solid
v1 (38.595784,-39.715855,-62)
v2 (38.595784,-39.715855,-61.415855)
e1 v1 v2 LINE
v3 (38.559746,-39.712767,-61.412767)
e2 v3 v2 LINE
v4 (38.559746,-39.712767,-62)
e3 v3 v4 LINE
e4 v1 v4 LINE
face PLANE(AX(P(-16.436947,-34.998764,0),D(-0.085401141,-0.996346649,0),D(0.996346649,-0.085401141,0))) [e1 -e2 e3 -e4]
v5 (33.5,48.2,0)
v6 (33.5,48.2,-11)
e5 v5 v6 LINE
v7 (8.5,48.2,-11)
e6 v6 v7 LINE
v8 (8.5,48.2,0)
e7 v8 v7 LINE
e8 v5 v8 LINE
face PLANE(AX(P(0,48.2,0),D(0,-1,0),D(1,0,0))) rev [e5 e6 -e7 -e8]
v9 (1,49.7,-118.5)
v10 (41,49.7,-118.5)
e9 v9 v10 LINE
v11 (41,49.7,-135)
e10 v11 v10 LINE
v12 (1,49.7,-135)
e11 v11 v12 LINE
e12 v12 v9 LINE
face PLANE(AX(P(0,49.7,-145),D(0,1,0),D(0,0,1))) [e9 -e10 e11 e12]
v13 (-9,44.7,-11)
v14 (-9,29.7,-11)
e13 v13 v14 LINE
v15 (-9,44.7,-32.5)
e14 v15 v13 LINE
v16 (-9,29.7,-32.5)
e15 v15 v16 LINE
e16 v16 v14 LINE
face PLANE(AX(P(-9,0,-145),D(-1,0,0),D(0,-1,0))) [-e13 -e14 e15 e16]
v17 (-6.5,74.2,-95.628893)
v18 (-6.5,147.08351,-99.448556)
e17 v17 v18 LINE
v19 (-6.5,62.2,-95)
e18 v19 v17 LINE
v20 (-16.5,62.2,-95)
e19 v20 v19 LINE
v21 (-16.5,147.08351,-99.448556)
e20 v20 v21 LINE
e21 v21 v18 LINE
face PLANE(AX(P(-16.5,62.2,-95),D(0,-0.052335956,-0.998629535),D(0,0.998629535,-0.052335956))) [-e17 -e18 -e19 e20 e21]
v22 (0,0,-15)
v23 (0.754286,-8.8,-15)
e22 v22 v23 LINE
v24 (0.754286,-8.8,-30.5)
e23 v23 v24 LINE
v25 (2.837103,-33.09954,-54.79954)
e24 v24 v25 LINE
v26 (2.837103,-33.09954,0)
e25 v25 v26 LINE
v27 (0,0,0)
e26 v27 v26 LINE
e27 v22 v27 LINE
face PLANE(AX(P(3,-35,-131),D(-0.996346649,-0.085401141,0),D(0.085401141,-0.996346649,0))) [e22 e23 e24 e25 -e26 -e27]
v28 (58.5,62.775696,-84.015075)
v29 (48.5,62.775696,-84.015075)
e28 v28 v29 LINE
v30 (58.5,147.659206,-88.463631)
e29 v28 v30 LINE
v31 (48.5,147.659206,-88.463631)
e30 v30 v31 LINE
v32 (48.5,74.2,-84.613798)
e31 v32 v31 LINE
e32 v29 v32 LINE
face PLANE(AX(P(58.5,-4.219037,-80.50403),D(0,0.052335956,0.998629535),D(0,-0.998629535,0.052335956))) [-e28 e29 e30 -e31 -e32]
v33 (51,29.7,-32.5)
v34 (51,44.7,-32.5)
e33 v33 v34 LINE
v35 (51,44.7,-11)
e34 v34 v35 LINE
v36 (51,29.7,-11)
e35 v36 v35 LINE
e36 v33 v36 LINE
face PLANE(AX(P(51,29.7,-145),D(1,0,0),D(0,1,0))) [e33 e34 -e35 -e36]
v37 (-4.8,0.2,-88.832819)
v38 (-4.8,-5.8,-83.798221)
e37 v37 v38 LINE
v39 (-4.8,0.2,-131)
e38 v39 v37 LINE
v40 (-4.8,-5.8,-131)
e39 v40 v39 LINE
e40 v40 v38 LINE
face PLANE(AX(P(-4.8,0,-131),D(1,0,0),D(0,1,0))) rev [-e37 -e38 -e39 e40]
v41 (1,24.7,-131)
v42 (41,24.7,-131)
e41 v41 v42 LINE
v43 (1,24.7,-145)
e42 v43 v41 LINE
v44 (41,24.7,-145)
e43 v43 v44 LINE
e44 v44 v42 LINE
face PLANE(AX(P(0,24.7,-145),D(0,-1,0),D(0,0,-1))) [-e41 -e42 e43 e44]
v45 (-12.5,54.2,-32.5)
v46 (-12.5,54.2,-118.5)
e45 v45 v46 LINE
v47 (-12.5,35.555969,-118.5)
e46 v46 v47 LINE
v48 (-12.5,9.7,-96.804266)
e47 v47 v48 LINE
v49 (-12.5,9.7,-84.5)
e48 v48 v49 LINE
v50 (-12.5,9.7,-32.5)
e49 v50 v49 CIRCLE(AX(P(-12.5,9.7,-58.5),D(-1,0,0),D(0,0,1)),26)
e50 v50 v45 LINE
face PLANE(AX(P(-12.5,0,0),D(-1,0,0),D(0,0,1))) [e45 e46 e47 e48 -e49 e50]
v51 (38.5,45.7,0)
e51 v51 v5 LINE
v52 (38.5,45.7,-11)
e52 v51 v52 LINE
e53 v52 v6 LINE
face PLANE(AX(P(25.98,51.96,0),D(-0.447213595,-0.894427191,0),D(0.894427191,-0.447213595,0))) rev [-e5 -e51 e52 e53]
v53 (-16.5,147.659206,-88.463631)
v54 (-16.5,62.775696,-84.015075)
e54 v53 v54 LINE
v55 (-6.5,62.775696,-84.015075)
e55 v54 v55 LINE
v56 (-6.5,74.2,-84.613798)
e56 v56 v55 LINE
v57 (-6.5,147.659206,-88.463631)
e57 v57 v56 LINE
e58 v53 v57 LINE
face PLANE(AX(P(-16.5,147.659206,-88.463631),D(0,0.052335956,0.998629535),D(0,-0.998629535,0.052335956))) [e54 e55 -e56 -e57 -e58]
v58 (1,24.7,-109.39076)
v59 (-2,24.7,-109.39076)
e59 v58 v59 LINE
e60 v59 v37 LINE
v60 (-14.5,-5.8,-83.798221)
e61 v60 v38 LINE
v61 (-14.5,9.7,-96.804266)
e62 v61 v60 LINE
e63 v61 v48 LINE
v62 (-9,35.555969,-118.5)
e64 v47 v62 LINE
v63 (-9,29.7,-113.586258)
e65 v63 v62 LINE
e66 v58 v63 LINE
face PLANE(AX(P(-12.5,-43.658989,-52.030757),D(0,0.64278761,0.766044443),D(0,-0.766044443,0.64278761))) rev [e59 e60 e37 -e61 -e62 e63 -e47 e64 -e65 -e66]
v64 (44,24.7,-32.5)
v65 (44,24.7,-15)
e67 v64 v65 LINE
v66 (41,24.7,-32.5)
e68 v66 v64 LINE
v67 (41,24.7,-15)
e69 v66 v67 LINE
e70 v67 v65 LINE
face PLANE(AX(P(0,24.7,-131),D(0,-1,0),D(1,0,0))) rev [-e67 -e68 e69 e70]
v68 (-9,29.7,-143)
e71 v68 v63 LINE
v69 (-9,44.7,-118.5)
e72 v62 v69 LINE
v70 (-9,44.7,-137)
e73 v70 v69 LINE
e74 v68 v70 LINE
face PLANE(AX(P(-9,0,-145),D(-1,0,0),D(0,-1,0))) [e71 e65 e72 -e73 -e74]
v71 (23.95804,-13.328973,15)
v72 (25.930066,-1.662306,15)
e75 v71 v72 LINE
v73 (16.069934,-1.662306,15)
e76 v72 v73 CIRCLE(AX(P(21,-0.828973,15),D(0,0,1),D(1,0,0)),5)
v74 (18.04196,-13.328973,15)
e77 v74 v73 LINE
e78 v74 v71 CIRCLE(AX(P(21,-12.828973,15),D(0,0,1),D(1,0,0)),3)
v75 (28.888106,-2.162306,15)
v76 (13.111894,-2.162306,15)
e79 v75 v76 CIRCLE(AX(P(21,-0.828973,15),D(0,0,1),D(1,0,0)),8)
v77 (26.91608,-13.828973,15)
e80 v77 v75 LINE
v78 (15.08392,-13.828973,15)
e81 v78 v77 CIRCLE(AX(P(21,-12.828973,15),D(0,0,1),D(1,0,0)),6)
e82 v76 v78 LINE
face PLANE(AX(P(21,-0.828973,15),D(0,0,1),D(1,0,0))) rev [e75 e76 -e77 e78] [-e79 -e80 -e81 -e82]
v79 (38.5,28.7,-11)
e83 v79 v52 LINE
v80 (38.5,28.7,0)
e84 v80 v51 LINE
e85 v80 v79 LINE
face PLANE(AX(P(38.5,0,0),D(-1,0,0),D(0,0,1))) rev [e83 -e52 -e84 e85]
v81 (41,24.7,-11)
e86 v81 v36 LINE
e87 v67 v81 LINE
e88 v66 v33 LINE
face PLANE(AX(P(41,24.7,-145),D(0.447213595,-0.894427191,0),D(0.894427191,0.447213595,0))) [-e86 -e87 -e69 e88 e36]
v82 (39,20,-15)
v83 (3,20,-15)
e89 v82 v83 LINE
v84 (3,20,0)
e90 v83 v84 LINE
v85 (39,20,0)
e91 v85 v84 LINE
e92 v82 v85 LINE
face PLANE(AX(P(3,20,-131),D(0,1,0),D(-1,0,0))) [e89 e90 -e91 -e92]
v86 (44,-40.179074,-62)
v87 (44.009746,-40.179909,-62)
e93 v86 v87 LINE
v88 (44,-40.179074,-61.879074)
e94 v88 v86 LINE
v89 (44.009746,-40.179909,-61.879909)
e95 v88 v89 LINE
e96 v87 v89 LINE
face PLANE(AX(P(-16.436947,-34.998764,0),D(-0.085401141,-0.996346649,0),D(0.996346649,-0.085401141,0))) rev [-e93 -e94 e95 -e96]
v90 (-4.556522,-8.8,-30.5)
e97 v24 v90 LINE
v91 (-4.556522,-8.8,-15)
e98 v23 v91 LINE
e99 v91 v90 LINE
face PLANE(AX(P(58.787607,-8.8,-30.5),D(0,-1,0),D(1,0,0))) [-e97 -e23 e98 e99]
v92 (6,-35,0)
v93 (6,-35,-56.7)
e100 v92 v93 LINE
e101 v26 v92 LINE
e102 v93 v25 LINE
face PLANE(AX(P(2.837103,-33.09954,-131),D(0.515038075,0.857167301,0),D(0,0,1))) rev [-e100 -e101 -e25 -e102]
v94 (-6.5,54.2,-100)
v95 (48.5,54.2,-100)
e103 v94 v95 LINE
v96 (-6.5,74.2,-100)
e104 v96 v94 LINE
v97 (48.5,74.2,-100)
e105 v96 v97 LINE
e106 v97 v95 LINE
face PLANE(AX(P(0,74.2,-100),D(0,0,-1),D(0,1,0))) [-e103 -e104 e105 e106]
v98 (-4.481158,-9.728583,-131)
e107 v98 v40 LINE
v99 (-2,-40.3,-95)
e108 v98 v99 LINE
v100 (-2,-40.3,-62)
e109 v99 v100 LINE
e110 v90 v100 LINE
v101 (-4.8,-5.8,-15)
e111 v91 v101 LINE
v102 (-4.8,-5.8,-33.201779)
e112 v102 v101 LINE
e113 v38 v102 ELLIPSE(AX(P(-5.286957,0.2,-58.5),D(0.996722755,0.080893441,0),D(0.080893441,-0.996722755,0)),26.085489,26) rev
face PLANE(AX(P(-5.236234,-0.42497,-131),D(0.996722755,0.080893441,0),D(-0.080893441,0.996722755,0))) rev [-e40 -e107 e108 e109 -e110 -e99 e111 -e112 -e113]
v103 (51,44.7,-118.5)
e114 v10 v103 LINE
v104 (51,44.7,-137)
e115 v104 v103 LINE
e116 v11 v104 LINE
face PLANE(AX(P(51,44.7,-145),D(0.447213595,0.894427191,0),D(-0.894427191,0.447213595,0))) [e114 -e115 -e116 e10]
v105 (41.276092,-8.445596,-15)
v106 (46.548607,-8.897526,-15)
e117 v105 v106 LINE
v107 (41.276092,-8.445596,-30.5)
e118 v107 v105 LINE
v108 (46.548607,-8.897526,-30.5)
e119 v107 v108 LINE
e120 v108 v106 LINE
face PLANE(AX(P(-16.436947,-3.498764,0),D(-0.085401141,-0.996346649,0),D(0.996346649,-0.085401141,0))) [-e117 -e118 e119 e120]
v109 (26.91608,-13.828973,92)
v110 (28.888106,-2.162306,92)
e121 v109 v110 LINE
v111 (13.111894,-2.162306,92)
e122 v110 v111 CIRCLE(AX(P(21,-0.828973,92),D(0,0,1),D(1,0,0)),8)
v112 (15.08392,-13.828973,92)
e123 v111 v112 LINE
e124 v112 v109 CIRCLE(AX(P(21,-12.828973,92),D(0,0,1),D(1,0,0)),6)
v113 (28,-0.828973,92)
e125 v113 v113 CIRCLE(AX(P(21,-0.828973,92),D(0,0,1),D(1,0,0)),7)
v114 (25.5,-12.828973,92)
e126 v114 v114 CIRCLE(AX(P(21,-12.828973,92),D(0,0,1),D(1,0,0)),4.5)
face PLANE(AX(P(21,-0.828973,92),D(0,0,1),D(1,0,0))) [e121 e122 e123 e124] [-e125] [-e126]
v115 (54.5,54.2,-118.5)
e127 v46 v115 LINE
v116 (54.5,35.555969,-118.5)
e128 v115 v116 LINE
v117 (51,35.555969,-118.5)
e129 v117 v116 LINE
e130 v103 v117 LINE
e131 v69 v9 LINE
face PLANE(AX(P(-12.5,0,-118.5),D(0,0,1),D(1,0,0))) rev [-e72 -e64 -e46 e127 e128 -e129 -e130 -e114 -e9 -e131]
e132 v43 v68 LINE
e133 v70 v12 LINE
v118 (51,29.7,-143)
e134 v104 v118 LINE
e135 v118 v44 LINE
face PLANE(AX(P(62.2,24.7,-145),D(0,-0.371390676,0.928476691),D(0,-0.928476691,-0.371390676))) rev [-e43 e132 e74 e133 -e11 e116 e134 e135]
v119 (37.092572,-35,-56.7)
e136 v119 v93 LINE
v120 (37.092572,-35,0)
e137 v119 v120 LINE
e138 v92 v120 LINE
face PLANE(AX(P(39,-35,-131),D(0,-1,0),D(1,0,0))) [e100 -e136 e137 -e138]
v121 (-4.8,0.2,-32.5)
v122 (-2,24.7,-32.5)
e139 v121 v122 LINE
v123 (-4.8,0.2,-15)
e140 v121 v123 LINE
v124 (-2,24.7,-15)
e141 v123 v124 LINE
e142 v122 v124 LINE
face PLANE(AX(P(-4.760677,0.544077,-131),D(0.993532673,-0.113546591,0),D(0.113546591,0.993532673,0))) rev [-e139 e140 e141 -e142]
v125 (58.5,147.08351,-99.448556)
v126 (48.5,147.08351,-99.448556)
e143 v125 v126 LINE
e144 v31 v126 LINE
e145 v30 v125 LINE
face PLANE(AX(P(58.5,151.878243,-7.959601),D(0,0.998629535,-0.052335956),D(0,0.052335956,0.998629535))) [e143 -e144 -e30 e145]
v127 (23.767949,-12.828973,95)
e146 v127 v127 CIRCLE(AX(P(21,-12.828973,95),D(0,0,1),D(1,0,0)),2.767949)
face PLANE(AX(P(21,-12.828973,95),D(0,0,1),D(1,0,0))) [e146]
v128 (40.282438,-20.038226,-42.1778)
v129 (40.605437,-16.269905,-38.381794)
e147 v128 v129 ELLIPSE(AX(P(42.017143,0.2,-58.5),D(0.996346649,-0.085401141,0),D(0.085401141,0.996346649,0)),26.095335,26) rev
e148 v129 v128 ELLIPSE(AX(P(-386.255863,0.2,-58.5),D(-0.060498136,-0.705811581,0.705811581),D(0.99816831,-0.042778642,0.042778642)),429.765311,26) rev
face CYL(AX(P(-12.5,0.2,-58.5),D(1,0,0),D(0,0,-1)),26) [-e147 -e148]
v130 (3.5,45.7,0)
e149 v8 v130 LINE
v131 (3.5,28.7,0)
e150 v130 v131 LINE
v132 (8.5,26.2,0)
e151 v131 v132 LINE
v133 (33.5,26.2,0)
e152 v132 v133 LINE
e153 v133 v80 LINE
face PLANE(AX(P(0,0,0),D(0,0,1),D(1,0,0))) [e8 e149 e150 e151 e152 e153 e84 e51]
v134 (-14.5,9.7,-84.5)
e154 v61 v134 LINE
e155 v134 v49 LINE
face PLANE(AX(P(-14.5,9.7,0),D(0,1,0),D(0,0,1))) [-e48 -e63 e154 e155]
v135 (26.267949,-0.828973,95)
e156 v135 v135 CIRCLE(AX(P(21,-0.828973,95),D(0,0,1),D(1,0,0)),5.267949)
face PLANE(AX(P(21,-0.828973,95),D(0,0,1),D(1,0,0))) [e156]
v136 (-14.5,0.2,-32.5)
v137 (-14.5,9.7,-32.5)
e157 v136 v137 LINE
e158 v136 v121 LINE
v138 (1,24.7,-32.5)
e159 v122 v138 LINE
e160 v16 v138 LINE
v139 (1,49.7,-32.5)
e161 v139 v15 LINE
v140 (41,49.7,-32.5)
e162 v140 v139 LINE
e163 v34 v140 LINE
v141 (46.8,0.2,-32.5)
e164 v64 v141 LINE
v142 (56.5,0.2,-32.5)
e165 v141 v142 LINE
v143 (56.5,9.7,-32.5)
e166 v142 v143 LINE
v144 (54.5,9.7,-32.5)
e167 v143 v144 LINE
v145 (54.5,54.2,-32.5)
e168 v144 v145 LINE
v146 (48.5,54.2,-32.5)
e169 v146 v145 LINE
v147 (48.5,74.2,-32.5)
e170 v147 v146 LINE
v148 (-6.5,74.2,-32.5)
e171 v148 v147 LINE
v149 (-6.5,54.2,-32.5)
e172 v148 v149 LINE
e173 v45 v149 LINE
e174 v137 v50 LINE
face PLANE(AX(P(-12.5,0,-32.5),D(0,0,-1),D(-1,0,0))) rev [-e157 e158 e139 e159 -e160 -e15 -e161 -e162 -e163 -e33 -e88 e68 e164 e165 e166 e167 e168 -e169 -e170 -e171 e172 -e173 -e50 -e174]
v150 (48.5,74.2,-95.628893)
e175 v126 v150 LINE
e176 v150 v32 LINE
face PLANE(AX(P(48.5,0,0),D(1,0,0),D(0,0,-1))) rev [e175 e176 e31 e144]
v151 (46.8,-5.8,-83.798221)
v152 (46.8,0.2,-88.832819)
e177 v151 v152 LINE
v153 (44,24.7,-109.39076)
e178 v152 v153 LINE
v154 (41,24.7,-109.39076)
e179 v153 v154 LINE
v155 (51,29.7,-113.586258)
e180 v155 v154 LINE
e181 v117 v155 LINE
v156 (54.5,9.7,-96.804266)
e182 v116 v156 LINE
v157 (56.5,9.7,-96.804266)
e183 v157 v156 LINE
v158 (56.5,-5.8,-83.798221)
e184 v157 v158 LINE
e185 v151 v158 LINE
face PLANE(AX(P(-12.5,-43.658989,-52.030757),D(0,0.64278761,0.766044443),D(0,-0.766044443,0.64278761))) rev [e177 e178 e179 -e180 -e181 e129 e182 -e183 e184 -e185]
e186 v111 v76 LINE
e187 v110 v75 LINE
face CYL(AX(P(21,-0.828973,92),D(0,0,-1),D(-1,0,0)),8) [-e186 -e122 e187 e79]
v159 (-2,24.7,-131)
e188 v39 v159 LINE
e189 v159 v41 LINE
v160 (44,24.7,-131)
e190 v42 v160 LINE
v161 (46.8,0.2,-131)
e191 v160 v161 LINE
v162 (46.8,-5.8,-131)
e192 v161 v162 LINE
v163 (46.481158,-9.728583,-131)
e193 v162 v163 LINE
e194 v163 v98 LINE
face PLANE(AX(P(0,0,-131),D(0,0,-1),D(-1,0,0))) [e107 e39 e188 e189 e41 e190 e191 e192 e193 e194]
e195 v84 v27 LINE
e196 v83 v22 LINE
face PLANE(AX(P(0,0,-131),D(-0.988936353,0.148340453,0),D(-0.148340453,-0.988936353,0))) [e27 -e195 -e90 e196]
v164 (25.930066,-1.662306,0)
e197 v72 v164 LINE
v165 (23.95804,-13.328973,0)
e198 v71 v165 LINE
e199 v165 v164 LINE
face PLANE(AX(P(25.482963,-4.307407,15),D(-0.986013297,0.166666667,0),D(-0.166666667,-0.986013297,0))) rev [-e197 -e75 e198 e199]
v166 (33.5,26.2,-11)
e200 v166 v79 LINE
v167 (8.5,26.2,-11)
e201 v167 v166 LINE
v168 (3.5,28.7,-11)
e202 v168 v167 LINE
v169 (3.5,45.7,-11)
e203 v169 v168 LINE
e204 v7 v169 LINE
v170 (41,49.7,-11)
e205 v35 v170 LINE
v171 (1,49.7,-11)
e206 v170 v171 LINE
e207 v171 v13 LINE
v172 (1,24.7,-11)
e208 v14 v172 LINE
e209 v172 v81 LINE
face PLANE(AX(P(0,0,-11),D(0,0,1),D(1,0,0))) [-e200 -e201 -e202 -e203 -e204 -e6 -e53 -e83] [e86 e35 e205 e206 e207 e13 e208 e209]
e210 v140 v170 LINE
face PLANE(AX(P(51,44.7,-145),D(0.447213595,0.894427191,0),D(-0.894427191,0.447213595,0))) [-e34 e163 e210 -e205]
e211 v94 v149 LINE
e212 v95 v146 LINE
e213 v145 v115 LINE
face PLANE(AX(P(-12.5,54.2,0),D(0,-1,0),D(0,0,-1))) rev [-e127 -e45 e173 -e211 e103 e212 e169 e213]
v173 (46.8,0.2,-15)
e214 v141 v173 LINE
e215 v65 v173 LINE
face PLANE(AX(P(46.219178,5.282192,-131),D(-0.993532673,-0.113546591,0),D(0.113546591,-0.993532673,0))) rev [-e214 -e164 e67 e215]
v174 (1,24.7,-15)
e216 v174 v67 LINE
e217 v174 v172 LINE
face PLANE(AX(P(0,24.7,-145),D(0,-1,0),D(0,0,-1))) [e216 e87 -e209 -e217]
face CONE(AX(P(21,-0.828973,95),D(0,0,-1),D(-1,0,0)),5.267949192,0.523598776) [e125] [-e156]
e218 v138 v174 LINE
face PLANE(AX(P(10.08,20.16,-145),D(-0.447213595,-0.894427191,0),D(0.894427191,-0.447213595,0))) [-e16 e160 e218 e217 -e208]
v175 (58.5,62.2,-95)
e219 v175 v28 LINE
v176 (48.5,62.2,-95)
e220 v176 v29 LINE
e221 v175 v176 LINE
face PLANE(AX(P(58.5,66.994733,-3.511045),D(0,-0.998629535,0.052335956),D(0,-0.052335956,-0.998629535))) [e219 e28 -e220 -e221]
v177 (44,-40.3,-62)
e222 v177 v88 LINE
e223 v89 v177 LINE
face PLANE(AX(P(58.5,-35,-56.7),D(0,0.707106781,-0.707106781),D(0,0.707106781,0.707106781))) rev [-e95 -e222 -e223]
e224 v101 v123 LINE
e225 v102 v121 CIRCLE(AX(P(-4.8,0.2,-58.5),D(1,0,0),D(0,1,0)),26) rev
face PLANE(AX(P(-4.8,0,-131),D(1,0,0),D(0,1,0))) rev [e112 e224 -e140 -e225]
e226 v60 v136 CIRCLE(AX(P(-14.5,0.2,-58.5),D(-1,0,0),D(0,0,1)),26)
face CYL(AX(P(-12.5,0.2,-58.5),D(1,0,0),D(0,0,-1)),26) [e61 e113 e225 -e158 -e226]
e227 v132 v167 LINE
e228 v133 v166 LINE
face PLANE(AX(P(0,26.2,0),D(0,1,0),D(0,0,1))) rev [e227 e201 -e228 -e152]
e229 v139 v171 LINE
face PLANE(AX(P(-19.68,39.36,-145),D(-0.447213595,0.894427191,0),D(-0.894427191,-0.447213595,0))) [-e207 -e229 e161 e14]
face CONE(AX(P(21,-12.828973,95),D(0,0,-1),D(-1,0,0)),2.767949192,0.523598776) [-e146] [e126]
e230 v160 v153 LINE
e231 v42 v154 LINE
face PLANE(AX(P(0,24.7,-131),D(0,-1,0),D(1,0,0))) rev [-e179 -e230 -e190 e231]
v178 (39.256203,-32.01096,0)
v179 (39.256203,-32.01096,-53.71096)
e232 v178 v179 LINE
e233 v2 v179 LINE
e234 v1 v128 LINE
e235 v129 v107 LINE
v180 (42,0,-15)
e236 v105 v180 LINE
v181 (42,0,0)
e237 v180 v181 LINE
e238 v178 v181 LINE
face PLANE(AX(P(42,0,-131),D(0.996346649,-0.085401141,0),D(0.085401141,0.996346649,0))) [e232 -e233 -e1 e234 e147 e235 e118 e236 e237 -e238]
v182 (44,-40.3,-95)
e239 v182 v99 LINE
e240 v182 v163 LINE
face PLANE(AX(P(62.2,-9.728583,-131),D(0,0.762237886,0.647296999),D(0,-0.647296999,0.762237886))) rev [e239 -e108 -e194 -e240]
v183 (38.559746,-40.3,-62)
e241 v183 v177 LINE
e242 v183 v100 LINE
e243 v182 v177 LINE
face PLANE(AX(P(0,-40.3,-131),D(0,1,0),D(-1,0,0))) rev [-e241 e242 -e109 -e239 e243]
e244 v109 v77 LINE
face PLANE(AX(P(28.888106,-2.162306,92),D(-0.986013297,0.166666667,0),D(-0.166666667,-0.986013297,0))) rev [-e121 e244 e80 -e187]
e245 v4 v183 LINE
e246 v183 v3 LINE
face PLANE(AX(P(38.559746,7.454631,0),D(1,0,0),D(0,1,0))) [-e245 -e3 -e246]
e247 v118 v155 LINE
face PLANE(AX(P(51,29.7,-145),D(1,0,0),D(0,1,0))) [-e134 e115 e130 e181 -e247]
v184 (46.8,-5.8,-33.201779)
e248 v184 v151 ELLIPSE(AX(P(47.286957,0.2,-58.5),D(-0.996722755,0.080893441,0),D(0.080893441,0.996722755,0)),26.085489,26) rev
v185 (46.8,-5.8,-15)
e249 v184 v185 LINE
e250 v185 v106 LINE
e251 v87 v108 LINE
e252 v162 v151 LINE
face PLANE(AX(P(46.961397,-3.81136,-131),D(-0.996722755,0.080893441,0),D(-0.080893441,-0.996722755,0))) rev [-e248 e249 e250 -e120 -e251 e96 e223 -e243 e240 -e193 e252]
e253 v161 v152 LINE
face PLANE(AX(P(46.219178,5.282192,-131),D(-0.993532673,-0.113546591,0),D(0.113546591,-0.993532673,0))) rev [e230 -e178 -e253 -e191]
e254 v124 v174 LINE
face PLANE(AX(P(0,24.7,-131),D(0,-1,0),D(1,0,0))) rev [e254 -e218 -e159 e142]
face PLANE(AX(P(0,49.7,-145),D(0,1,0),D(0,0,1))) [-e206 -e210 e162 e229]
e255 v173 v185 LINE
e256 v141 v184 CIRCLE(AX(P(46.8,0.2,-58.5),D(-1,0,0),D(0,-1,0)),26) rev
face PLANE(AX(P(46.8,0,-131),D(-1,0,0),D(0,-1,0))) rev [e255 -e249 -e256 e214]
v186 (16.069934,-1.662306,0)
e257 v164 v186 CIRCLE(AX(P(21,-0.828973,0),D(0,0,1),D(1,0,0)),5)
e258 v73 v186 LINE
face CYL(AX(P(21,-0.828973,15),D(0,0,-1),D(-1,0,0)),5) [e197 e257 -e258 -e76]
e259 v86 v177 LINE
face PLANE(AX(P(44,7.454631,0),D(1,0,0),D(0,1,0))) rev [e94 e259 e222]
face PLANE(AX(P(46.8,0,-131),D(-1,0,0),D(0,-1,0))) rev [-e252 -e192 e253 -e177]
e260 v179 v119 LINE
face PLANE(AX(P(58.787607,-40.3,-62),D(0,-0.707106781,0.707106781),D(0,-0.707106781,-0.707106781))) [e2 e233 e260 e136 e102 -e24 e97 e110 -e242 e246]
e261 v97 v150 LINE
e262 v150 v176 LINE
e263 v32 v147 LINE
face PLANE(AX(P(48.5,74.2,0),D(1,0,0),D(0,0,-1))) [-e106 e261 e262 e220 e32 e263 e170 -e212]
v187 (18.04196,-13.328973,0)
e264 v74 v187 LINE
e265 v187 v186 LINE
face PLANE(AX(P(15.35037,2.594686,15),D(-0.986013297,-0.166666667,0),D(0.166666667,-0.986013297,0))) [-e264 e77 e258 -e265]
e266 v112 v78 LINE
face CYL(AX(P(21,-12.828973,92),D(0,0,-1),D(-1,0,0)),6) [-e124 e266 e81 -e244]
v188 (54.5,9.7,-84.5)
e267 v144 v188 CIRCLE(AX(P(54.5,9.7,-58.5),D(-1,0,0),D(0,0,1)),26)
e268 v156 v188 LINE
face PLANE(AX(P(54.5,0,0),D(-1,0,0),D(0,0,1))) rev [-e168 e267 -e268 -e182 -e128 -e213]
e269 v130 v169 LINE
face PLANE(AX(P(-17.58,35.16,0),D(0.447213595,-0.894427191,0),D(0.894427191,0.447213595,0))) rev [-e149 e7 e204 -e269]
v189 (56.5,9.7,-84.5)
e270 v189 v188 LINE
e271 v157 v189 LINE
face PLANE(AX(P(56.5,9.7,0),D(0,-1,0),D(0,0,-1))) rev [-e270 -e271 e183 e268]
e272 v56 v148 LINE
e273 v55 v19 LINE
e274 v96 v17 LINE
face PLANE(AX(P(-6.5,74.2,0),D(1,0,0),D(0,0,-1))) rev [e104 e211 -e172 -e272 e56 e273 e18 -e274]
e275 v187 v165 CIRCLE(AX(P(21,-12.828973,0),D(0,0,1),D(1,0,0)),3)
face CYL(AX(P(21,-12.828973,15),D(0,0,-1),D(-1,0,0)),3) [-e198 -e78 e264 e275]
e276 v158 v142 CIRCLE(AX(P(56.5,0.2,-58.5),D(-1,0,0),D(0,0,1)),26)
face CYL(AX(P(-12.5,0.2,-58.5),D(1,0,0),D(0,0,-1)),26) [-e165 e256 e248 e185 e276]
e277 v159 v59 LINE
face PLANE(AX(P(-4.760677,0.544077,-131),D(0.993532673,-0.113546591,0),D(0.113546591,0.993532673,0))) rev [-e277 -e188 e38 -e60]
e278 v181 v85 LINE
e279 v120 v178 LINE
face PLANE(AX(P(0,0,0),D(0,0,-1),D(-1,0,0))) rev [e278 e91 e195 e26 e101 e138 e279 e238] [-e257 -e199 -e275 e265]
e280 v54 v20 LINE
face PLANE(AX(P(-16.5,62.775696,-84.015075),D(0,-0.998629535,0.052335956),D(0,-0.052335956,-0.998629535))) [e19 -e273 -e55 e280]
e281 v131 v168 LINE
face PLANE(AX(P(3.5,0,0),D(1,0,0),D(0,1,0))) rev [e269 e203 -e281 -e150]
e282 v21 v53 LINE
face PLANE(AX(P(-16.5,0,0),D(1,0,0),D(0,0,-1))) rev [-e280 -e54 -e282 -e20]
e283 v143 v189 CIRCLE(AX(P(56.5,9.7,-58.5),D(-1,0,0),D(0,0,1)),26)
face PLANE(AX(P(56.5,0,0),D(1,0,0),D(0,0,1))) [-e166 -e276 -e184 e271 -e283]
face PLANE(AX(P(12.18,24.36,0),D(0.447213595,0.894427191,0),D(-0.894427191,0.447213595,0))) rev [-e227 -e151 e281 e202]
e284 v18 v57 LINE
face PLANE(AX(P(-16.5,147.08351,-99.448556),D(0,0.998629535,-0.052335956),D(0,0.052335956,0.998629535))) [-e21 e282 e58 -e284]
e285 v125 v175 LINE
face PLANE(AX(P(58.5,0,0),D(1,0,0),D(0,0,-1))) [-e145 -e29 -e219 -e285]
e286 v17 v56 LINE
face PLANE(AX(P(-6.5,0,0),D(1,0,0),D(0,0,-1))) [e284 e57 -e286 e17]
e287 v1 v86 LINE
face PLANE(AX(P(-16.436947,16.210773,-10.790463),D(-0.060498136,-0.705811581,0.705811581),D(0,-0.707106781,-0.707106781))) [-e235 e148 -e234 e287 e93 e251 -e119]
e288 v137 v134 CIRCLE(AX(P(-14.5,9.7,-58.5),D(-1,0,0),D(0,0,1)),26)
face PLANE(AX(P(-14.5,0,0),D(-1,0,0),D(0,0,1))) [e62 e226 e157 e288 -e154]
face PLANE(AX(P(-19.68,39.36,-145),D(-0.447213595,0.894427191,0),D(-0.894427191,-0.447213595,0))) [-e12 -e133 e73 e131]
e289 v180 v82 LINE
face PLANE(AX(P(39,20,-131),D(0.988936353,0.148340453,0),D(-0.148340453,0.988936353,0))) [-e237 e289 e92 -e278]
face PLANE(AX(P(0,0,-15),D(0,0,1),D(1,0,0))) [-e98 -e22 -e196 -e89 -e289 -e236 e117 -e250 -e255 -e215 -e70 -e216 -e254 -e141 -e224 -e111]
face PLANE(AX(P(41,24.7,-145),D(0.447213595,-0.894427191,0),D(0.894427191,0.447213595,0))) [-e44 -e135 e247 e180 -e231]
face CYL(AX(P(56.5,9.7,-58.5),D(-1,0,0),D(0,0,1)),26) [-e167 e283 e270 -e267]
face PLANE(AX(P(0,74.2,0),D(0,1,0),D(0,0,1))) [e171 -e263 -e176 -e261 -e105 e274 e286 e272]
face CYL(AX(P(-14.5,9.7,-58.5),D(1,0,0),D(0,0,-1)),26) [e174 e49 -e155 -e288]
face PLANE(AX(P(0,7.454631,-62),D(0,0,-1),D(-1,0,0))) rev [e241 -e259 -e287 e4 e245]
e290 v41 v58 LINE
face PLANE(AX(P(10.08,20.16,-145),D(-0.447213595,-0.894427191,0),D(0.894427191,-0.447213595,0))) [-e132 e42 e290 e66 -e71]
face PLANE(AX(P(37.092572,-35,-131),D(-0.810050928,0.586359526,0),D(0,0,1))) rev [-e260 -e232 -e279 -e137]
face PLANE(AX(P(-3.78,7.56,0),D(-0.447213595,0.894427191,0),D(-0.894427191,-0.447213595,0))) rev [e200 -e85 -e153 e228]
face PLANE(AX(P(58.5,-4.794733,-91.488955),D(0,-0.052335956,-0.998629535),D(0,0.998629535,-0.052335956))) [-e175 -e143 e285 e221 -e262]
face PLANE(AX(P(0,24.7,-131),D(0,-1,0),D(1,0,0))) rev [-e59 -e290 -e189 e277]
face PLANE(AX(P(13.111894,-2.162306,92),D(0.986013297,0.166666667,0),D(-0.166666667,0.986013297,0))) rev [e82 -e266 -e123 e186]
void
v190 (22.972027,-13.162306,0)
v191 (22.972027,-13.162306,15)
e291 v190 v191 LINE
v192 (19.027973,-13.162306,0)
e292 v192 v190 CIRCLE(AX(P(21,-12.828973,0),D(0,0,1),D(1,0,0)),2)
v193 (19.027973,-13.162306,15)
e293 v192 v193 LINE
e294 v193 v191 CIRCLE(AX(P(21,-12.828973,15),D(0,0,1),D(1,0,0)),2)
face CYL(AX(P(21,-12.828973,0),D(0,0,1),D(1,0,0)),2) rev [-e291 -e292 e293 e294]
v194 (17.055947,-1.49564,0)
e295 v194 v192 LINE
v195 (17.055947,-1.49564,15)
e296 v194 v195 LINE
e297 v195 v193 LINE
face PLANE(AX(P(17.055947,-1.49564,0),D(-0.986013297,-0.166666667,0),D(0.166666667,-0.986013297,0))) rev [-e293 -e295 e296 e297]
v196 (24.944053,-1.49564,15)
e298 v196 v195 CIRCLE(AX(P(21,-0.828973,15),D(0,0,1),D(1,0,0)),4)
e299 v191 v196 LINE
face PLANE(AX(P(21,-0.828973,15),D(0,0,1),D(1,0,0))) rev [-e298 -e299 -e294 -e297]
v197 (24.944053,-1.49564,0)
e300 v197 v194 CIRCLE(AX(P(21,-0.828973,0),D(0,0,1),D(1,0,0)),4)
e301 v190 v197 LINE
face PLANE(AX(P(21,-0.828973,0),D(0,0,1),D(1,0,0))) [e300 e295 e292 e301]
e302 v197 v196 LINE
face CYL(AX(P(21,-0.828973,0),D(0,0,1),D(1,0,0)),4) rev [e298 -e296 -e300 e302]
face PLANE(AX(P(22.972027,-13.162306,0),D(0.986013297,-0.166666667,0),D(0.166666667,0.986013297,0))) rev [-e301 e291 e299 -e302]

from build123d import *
from OCP.BRepFilletAPI import BRepFilletAPI_MakeChamfer

# Parameters (mm, degrees)
EXTRUDE_1_DEPTH     = 131
EXTRUDE_2_DEPTH     = 116
CUT_EXTRUDE_1_REACH = 148.45
CUT_EXTRUDE_2_REACH = 148.994
EXTRUDE_3_DEPTH     = 134
CUT_EXTRUDE_3_DEPTH = 67
EXTRUDE_4_DEPTH     = 11
EXTRUDE_START       = -33.5
EXTRUDE_5_DEPTH     = 67
EXTRUDE_6_DEPTH     = 2
EXTRUDE_7_DEPTH     = 20
EXTRUDE_8_DEPTH     = 10
EXTRUDE_9_DEPTH     = 10
CUT_EXTRUDE_4_REACH = 246.491
SKETCH_16_W         = 5.440253517
SKETCH_16_H         = 47
CUT_EXTRUDE_5_DEPTH = 219.790404517
EXTRUDE_10_DEPTH    = 15
CUT_EXTRUDE_6_DEPTH = 15
EXTRUDE_15_DEPTH    = 77
SKETCH_23_R         = 7
SKETCH_23_R_2       = 4.5
EXTRUDE_16_DEPTH    = 3
CHAMFER_1_SIZE      = 3
CHAMFER_1_SIZE_2    = 1.732050808
CHAMFER_2_SIZE      = 3
CHAMFER_2_SIZE2     = 1.907428497


# Read off the part's stored shape, not the designer's step: 凸台-拉伸5
with BuildPart() as part:
    # 草图1 → 凸台-拉伸1 (new body)
    with BuildSketch(Plane.XY):
        Polygon((0, 0), (3, 20), (39, 20), (42, 0), (39, -35), (3, -35), align=None)
    extrude(amount=-EXTRUDE_1_DEPTH)

    # 草图2 → 凸台-拉伸2 (add)
    with BuildSketch(Plane.XY.offset(-15)):
        Polygon((-2, 24.7), (-4.8, 0.2), (-4.8, -5.8), (-2, -40.3), (21, -40.3), (21, -35), (3, -35), (0, 0), (3, 20), (21, 20), (21, 24.7), align=None)
        Polygon((44, 24.7), (21, 24.7), (21, 20), (39, 20), (42, 0), (39, -35), (21, -35), (21, -40.3), (44, -40.3), (46.8, -5.8), (46.8, 0.2), align=None)
    extrude(amount=-EXTRUDE_2_DEPTH)

    # 切除-拉伸1: up to this plane
    cut_extrude_1_end = Plane(origin=(3, -35, -131), z_dir=(-0.996346649041751, -0.08540114134643588, 0))
    # 草图3 → 切除-拉伸1 (cut, up to the surface)
    with BuildSketch(Plane.ZY.offset(4.8), mode=Mode.PRIVATE) as cut_extrude_1_sk1:
        Polygon((-131, -40.3), (-131, -10.092413278), (-95, -40.3), align=None)
    cut_extrude_1_tool1 = split(extrude(cut_extrude_1_sk1.sketch, amount=-CUT_EXTRUDE_1_REACH, mode=Mode.PRIVATE), bisect_by=cut_extrude_1_end, keep=Keep.BOTH, mode=Mode.PRIVATE)
    add(cut_extrude_1_tool1.solids().sort_by_distance((-4.8, -30.230804, -119))[0], mode=Mode.SUBTRACT)
    # 草图3 → 切除-拉伸1 (cut, up to the surface)
    with BuildSketch(Plane.ZY.offset(4.8), mode=Mode.PRIVATE) as cut_extrude_1_sk2:
        Polygon((-62, -40.3), (-30.5, -8.8), (-15, -8.8), (-15, -40.3), align=None)
    cut_extrude_1_tool2 = split(extrude(cut_extrude_1_sk2.sketch, amount=-CUT_EXTRUDE_1_REACH, mode=Mode.PRIVATE), bisect_by=cut_extrude_1_end, keep=Keep.BOTH, mode=Mode.PRIVATE)
    add(cut_extrude_1_tool2.solids().sort_by_distance((-4.8, -27.196, -31.948))[0], mode=Mode.SUBTRACT)

    # 切除-拉伸2: up to this plane
    cut_extrude_2_end = Plane(origin=(42, 0, -131), z_dir=(0.996346649041751, -0.08540114134643569, 0))
    # 草图4 → 切除-拉伸2 (cut, up to the surface)
    with BuildSketch(Plane(origin=(46.8, 0, 0), x_dir=(0, 0, -1), z_dir=(1, 0, 0)), mode=Mode.PRIVATE) as cut_extrude_2_sk1:
        Polygon((15, -8.919073988), (15, -40.419073988), (62, -40.419073988), (30.5, -8.919073988), align=None)
    cut_extrude_2_tool1 = split(extrude(cut_extrude_2_sk1.sketch, amount=CUT_EXTRUDE_2_REACH, dir=(-0.996346649042, 0.085401141346, 0), mode=Mode.PRIVATE), bisect_by=cut_extrude_2_end, keep=Keep.BOTH, mode=Mode.PRIVATE)
    add(cut_extrude_2_tool1.solids().sort_by_distance((46.8, -27.315074, -31.948))[0], mode=Mode.SUBTRACT)

    # 草图6 → 凸台-拉伸3 (add)
    with BuildSketch(Plane.XY.offset(-11)):
        Polygon((-9, 29.7), (1, 24.7), (41, 24.7), (51, 29.7), (51, 44.7), (41, 49.7), (1, 49.7), (-9, 44.7), align=None)
    extrude(amount=-EXTRUDE_3_DEPTH)

    # 草图7 → 切除-拉伸3 (cut, symmetric)
    with BuildSketch(Plane.ZY.offset(4.8)):
        Polygon((-95, -40.3), (-131, -40.3), (-131, -9.728583388), align=None)
        Polygon((-145, 24.7), (-135, 49.7), (-145, 49.7), align=None)
    extrude(amount=CUT_EXTRUDE_3_DEPTH, both=True, mode=Mode.SUBTRACT)

    # 草图9 → 凸台-拉伸4 (add)
    with BuildSketch(Plane.XY.offset(-11)):
        Polygon((3.5, 45.7), (3.5, 28.7), (8.5, 26.2), (33.5, 26.2), (38.5, 28.7), (38.5, 45.7), (33.5, 48.2), (8.5, 48.2), align=None)
    extrude(amount=EXTRUDE_4_DEPTH)

    # 凸台-拉伸5 outline → 凸台-拉伸5 (add)
    with BuildSketch(Plane.ZY.offset(-21).offset(EXTRUDE_START)):
        with BuildLine():
            Line((-118.5, 35.555969457), (-83.798221281, -5.8))
            ThreePointArc((-83.798221281, -5.8), (-66.915700425, -24.400324924), (-42.17780049, -20.038226285))
            ThreePointArc((-42.17780049, -20.038226285), (-40.182635106, -18.251941452), (-38.381793618, -16.269905038))
            ThreePointArc((-38.381793618, -16.269905038), (-34.014561818, -8.544330565), (-32.5, 0.2))
            Line((-32.5, 0.2), (-32.5, 54.2))
            Line((-32.5, 54.2), (-118.5, 54.2))
            Line((-118.5, 54.2), (-118.5, 35.555969457))
        make_face()
    extrude(amount=EXTRUDE_5_DEPTH)

    # 草图11 → 凸台-拉伸6 (add)
    with BuildSketch(Plane.ZY.offset(12.5)):
        with BuildLine():
            Line((-84.5, 9.7), (-96.804265564, 9.7))
            Line((-96.804265564, 9.7), (-83.798221281, -5.8))
            ThreePointArc((-83.798221281, -5.8), (-66.915700425, -24.400324924), (-42.17780049, -20.038226285))
            ThreePointArc((-42.17780049, -20.038226285), (-40.182635106, -18.251941452), (-38.381793618, -16.269905038))
            ThreePointArc((-38.381793618, -16.269905038), (-34.014561818, -8.544330565), (-32.5, 0.2))
            Line((-32.5, 0.2), (-32.5, 9.7))
            ThreePointArc((-32.5, 9.7), (-58.5, 35.7), (-84.5, 9.7))
        make_face()
    extrude_6 = extrude(amount=EXTRUDE_6_DEPTH)

    # 镜向1: 凸台-拉伸6 across plane
    add(extrude_6.mirror(Plane.ZY.offset(-21)))

    # 草图12 → 凸台-拉伸7 (add)
    with BuildSketch(Plane(origin=(0, 54.2, 0), x_dir=(1, 0, 0), z_dir=(0, 1, 0))):
        Polygon((21, 100), (-6.5, 100), (-6.5, 32.5), (48.5, 32.5), (48.5, 100), align=None)
    extrude(amount=EXTRUDE_7_DEPTH)

    # 草图13 → 凸台-拉伸8 (add)
    with BuildSketch(Plane.ZY.offset(6.5)):
        Polygon((-95, 62.2), (-99.448556281, 147.083510454), (-88.463631398, 147.659205973), (-84.015075118, 62.775695519), align=None)
    extrude(amount=EXTRUDE_8_DEPTH)

    # 草图14 → 凸台-拉伸9 (add)
    with BuildSketch(Plane(origin=(48.5, 0, 0), x_dir=(0, 0, -1), z_dir=(1, 0, 0))):
        Polygon((84.613797545, 74.2), (95.628893351, 74.2), (99.448556281, 147.083510454), (88.463631398, 147.659205973), align=None)
        Polygon((84.015075118, 62.775695519), (95, 62.2), (95.628893351, 74.2), (84.613797545, 74.2), align=None)
    extrude(amount=EXTRUDE_9_DEPTH)

    # 切除-拉伸4: up to this plane
    cut_extrude_4_end = Plane(origin=(-16.436947072, -34.998764239, 0), z_dir=(-0.08540114134643567, -0.996346649041751, 0))
    # 草图16 → 切除-拉伸4 (cut, up to the surface)
    with BuildSketch(Plane.XZ.offset(40.3), mode=Mode.PRIVATE) as cut_extrude_4_sk1:
        with Locations((41.279873241, -38.5)):
            Rectangle(SKETCH_16_W, SKETCH_16_H)
    cut_extrude_4_tool1 = split(extrude(cut_extrude_4_sk1.sketch, amount=-CUT_EXTRUDE_4_REACH, mode=Mode.PRIVATE), bisect_by=cut_extrude_4_end, keep=Keep.BOTH, mode=Mode.PRIVATE)
    add(cut_extrude_4_tool1.solids().sort_by_distance((41.279873, -40.3, -38.5))[0], mode=Mode.SUBTRACT)

    # 草图17 → 切除-拉伸5 (cut, through all)
    with BuildSketch(Plane.ZY.offset(12.5)):
        Polygon((-15, -40.3), (-15, -35), (-56.7, -35), (-62, -40.3), align=None)
    extrude(amount=-CUT_EXTRUDE_5_DEPTH, mode=Mode.SUBTRACT)

    # 草图18 → 凸台-拉伸10 (add)
    with BuildSketch(Plane.XY):
        with BuildLine():
            Line((16.069933514, -1.66230637), (18.041960108, -13.328973037))
            ThreePointArc((18.041960108, -13.328973037), (21, -15.828973037), (23.958039892, -13.328973037))
            Line((23.958039892, -13.328973037), (25.930066486, -1.66230637))
            ThreePointArc((25.930066486, -1.66230637), (21, 4.171026963), (16.069933514, -1.66230637))
        make_face()
    extrude(amount=EXTRUDE_10_DEPTH)

    # 草图20 → 切除-拉伸6 (cut)
    with BuildSketch(Plane.XY.offset(15)):
        with BuildLine():
            Line((17.055946811, -1.495639704), (19.027973406, -13.16230637))
            ThreePointArc((19.027973406, -13.16230637), (21, -14.828973037), (22.972026594, -13.16230637))
            Line((22.972026594, -13.16230637), (24.944053189, -1.495639704))
            ThreePointArc((24.944053189, -1.495639704), (21, 3.171026963), (17.055946811, -1.495639704))
        make_face()
    extrude(amount=-CUT_EXTRUDE_6_DEPTH, mode=Mode.SUBTRACT)

    # 草图21 → 凸台-拉伸15 (add)
    with BuildSketch(Plane.XY.offset(15)):
        with BuildLine():
            Line((13.111893623, -2.16230637), (15.083920217, -13.828973037))
            ThreePointArc((15.083920217, -13.828973037), (21, -18.828973037), (26.916079783, -13.828973037))
            Line((26.916079783, -13.828973037), (28.888106377, -2.16230637))
            ThreePointArc((28.888106377, -2.16230637), (21, 7.171026963), (13.111893623, -2.16230637))
        make_face()
    extrude(amount=EXTRUDE_15_DEPTH)

    # 草图23 → 凸台-拉伸16 (add)
    with BuildSketch(Plane.XY.offset(92)):
        with Locations((21, -0.828973037)):
            Circle(SKETCH_23_R)
        with Locations((21, -12.828973037)):
            Circle(SKETCH_23_R_2)
    extrude(amount=EXTRUDE_16_DEPTH)

    # 倒角1
    chamfer_1_edges_1 = [part.edges().sort_by_distance(p)[0] for p in [
        (14, -0.828973037, 95),
    ]]
    chamfer_1_side_1 = [part.faces().sort_by_distance(p)[0] for p in [
        (14, -0.828973037, 94.965358984),
    ]]
    chamfer_1_edges_2 = [part.edges().sort_by_distance(p)[0] for p in [
        (16.5, -12.828973037, 95),
    ]]
    chamfer_1_side_2 = [part.faces().sort_by_distance(p)[0] for p in [
        (16.5, -12.828973037, 94.965358984),
    ]]
    chamfer_1 = BRepFilletAPI_MakeChamfer(part.part.solid().wrapped)
    for e in chamfer_1_edges_1:
        chamfer_1.Add(CHAMFER_1_SIZE - 0.0001, CHAMFER_1_SIZE_2 - 0.0001, e.wrapped, chamfer_1_side_1[0].wrapped)
    for e in chamfer_1_edges_2:
        chamfer_1.Add(CHAMFER_1_SIZE - 0.0001, CHAMFER_1_SIZE_2 - 0.0001, e.wrapped, chamfer_1_side_2[0].wrapped)
    add(Compound.cast(chamfer_1.Shape()), mode=Mode.REPLACE)  # a hair under: the kernel refuses the full size

    # 倒角2: one chamfer whose edges measure the first distance from different faces: ONE call of the kernel's chamfer builder (chamfer() names one face for all edges)
    chamfer_2_edges_1 = [part.edges().sort_by_distance(p)[0] for p in [
        (3, -35, -28.35),
    ]]
    chamfer_2_side_1 = [part.faces().sort_by_distance(p)[0] for p in [
        (21, -35, -28.35),
    ]]
    chamfer_2_edges_2 = [part.edges().sort_by_distance(p)[0] for p in [
        (39, -35, -28.35),
    ]]
    chamfer_2_side_2 = [part.faces().sort_by_distance(p)[0] for p in [
        (40.177893681, -21.257907057, -21.206076587),
    ]]
    chamfer_2 = BRepFilletAPI_MakeChamfer(part.part.solid().wrapped)
    for e in chamfer_2_edges_1:
        chamfer_2.Add(CHAMFER_2_SIZE, CHAMFER_2_SIZE2, e.wrapped, chamfer_2_side_1[0].wrapped)  # the first distance lies on this face
    for e in chamfer_2_edges_2:
        chamfer_2.Add(CHAMFER_2_SIZE, CHAMFER_2_SIZE2, e.wrapped, chamfer_2_side_2[0].wrapped)  # the first distance lies on this face
    add(Compound.cast(chamfer_2.Shape()), mode=Mode.REPLACE)


solid = part.part
